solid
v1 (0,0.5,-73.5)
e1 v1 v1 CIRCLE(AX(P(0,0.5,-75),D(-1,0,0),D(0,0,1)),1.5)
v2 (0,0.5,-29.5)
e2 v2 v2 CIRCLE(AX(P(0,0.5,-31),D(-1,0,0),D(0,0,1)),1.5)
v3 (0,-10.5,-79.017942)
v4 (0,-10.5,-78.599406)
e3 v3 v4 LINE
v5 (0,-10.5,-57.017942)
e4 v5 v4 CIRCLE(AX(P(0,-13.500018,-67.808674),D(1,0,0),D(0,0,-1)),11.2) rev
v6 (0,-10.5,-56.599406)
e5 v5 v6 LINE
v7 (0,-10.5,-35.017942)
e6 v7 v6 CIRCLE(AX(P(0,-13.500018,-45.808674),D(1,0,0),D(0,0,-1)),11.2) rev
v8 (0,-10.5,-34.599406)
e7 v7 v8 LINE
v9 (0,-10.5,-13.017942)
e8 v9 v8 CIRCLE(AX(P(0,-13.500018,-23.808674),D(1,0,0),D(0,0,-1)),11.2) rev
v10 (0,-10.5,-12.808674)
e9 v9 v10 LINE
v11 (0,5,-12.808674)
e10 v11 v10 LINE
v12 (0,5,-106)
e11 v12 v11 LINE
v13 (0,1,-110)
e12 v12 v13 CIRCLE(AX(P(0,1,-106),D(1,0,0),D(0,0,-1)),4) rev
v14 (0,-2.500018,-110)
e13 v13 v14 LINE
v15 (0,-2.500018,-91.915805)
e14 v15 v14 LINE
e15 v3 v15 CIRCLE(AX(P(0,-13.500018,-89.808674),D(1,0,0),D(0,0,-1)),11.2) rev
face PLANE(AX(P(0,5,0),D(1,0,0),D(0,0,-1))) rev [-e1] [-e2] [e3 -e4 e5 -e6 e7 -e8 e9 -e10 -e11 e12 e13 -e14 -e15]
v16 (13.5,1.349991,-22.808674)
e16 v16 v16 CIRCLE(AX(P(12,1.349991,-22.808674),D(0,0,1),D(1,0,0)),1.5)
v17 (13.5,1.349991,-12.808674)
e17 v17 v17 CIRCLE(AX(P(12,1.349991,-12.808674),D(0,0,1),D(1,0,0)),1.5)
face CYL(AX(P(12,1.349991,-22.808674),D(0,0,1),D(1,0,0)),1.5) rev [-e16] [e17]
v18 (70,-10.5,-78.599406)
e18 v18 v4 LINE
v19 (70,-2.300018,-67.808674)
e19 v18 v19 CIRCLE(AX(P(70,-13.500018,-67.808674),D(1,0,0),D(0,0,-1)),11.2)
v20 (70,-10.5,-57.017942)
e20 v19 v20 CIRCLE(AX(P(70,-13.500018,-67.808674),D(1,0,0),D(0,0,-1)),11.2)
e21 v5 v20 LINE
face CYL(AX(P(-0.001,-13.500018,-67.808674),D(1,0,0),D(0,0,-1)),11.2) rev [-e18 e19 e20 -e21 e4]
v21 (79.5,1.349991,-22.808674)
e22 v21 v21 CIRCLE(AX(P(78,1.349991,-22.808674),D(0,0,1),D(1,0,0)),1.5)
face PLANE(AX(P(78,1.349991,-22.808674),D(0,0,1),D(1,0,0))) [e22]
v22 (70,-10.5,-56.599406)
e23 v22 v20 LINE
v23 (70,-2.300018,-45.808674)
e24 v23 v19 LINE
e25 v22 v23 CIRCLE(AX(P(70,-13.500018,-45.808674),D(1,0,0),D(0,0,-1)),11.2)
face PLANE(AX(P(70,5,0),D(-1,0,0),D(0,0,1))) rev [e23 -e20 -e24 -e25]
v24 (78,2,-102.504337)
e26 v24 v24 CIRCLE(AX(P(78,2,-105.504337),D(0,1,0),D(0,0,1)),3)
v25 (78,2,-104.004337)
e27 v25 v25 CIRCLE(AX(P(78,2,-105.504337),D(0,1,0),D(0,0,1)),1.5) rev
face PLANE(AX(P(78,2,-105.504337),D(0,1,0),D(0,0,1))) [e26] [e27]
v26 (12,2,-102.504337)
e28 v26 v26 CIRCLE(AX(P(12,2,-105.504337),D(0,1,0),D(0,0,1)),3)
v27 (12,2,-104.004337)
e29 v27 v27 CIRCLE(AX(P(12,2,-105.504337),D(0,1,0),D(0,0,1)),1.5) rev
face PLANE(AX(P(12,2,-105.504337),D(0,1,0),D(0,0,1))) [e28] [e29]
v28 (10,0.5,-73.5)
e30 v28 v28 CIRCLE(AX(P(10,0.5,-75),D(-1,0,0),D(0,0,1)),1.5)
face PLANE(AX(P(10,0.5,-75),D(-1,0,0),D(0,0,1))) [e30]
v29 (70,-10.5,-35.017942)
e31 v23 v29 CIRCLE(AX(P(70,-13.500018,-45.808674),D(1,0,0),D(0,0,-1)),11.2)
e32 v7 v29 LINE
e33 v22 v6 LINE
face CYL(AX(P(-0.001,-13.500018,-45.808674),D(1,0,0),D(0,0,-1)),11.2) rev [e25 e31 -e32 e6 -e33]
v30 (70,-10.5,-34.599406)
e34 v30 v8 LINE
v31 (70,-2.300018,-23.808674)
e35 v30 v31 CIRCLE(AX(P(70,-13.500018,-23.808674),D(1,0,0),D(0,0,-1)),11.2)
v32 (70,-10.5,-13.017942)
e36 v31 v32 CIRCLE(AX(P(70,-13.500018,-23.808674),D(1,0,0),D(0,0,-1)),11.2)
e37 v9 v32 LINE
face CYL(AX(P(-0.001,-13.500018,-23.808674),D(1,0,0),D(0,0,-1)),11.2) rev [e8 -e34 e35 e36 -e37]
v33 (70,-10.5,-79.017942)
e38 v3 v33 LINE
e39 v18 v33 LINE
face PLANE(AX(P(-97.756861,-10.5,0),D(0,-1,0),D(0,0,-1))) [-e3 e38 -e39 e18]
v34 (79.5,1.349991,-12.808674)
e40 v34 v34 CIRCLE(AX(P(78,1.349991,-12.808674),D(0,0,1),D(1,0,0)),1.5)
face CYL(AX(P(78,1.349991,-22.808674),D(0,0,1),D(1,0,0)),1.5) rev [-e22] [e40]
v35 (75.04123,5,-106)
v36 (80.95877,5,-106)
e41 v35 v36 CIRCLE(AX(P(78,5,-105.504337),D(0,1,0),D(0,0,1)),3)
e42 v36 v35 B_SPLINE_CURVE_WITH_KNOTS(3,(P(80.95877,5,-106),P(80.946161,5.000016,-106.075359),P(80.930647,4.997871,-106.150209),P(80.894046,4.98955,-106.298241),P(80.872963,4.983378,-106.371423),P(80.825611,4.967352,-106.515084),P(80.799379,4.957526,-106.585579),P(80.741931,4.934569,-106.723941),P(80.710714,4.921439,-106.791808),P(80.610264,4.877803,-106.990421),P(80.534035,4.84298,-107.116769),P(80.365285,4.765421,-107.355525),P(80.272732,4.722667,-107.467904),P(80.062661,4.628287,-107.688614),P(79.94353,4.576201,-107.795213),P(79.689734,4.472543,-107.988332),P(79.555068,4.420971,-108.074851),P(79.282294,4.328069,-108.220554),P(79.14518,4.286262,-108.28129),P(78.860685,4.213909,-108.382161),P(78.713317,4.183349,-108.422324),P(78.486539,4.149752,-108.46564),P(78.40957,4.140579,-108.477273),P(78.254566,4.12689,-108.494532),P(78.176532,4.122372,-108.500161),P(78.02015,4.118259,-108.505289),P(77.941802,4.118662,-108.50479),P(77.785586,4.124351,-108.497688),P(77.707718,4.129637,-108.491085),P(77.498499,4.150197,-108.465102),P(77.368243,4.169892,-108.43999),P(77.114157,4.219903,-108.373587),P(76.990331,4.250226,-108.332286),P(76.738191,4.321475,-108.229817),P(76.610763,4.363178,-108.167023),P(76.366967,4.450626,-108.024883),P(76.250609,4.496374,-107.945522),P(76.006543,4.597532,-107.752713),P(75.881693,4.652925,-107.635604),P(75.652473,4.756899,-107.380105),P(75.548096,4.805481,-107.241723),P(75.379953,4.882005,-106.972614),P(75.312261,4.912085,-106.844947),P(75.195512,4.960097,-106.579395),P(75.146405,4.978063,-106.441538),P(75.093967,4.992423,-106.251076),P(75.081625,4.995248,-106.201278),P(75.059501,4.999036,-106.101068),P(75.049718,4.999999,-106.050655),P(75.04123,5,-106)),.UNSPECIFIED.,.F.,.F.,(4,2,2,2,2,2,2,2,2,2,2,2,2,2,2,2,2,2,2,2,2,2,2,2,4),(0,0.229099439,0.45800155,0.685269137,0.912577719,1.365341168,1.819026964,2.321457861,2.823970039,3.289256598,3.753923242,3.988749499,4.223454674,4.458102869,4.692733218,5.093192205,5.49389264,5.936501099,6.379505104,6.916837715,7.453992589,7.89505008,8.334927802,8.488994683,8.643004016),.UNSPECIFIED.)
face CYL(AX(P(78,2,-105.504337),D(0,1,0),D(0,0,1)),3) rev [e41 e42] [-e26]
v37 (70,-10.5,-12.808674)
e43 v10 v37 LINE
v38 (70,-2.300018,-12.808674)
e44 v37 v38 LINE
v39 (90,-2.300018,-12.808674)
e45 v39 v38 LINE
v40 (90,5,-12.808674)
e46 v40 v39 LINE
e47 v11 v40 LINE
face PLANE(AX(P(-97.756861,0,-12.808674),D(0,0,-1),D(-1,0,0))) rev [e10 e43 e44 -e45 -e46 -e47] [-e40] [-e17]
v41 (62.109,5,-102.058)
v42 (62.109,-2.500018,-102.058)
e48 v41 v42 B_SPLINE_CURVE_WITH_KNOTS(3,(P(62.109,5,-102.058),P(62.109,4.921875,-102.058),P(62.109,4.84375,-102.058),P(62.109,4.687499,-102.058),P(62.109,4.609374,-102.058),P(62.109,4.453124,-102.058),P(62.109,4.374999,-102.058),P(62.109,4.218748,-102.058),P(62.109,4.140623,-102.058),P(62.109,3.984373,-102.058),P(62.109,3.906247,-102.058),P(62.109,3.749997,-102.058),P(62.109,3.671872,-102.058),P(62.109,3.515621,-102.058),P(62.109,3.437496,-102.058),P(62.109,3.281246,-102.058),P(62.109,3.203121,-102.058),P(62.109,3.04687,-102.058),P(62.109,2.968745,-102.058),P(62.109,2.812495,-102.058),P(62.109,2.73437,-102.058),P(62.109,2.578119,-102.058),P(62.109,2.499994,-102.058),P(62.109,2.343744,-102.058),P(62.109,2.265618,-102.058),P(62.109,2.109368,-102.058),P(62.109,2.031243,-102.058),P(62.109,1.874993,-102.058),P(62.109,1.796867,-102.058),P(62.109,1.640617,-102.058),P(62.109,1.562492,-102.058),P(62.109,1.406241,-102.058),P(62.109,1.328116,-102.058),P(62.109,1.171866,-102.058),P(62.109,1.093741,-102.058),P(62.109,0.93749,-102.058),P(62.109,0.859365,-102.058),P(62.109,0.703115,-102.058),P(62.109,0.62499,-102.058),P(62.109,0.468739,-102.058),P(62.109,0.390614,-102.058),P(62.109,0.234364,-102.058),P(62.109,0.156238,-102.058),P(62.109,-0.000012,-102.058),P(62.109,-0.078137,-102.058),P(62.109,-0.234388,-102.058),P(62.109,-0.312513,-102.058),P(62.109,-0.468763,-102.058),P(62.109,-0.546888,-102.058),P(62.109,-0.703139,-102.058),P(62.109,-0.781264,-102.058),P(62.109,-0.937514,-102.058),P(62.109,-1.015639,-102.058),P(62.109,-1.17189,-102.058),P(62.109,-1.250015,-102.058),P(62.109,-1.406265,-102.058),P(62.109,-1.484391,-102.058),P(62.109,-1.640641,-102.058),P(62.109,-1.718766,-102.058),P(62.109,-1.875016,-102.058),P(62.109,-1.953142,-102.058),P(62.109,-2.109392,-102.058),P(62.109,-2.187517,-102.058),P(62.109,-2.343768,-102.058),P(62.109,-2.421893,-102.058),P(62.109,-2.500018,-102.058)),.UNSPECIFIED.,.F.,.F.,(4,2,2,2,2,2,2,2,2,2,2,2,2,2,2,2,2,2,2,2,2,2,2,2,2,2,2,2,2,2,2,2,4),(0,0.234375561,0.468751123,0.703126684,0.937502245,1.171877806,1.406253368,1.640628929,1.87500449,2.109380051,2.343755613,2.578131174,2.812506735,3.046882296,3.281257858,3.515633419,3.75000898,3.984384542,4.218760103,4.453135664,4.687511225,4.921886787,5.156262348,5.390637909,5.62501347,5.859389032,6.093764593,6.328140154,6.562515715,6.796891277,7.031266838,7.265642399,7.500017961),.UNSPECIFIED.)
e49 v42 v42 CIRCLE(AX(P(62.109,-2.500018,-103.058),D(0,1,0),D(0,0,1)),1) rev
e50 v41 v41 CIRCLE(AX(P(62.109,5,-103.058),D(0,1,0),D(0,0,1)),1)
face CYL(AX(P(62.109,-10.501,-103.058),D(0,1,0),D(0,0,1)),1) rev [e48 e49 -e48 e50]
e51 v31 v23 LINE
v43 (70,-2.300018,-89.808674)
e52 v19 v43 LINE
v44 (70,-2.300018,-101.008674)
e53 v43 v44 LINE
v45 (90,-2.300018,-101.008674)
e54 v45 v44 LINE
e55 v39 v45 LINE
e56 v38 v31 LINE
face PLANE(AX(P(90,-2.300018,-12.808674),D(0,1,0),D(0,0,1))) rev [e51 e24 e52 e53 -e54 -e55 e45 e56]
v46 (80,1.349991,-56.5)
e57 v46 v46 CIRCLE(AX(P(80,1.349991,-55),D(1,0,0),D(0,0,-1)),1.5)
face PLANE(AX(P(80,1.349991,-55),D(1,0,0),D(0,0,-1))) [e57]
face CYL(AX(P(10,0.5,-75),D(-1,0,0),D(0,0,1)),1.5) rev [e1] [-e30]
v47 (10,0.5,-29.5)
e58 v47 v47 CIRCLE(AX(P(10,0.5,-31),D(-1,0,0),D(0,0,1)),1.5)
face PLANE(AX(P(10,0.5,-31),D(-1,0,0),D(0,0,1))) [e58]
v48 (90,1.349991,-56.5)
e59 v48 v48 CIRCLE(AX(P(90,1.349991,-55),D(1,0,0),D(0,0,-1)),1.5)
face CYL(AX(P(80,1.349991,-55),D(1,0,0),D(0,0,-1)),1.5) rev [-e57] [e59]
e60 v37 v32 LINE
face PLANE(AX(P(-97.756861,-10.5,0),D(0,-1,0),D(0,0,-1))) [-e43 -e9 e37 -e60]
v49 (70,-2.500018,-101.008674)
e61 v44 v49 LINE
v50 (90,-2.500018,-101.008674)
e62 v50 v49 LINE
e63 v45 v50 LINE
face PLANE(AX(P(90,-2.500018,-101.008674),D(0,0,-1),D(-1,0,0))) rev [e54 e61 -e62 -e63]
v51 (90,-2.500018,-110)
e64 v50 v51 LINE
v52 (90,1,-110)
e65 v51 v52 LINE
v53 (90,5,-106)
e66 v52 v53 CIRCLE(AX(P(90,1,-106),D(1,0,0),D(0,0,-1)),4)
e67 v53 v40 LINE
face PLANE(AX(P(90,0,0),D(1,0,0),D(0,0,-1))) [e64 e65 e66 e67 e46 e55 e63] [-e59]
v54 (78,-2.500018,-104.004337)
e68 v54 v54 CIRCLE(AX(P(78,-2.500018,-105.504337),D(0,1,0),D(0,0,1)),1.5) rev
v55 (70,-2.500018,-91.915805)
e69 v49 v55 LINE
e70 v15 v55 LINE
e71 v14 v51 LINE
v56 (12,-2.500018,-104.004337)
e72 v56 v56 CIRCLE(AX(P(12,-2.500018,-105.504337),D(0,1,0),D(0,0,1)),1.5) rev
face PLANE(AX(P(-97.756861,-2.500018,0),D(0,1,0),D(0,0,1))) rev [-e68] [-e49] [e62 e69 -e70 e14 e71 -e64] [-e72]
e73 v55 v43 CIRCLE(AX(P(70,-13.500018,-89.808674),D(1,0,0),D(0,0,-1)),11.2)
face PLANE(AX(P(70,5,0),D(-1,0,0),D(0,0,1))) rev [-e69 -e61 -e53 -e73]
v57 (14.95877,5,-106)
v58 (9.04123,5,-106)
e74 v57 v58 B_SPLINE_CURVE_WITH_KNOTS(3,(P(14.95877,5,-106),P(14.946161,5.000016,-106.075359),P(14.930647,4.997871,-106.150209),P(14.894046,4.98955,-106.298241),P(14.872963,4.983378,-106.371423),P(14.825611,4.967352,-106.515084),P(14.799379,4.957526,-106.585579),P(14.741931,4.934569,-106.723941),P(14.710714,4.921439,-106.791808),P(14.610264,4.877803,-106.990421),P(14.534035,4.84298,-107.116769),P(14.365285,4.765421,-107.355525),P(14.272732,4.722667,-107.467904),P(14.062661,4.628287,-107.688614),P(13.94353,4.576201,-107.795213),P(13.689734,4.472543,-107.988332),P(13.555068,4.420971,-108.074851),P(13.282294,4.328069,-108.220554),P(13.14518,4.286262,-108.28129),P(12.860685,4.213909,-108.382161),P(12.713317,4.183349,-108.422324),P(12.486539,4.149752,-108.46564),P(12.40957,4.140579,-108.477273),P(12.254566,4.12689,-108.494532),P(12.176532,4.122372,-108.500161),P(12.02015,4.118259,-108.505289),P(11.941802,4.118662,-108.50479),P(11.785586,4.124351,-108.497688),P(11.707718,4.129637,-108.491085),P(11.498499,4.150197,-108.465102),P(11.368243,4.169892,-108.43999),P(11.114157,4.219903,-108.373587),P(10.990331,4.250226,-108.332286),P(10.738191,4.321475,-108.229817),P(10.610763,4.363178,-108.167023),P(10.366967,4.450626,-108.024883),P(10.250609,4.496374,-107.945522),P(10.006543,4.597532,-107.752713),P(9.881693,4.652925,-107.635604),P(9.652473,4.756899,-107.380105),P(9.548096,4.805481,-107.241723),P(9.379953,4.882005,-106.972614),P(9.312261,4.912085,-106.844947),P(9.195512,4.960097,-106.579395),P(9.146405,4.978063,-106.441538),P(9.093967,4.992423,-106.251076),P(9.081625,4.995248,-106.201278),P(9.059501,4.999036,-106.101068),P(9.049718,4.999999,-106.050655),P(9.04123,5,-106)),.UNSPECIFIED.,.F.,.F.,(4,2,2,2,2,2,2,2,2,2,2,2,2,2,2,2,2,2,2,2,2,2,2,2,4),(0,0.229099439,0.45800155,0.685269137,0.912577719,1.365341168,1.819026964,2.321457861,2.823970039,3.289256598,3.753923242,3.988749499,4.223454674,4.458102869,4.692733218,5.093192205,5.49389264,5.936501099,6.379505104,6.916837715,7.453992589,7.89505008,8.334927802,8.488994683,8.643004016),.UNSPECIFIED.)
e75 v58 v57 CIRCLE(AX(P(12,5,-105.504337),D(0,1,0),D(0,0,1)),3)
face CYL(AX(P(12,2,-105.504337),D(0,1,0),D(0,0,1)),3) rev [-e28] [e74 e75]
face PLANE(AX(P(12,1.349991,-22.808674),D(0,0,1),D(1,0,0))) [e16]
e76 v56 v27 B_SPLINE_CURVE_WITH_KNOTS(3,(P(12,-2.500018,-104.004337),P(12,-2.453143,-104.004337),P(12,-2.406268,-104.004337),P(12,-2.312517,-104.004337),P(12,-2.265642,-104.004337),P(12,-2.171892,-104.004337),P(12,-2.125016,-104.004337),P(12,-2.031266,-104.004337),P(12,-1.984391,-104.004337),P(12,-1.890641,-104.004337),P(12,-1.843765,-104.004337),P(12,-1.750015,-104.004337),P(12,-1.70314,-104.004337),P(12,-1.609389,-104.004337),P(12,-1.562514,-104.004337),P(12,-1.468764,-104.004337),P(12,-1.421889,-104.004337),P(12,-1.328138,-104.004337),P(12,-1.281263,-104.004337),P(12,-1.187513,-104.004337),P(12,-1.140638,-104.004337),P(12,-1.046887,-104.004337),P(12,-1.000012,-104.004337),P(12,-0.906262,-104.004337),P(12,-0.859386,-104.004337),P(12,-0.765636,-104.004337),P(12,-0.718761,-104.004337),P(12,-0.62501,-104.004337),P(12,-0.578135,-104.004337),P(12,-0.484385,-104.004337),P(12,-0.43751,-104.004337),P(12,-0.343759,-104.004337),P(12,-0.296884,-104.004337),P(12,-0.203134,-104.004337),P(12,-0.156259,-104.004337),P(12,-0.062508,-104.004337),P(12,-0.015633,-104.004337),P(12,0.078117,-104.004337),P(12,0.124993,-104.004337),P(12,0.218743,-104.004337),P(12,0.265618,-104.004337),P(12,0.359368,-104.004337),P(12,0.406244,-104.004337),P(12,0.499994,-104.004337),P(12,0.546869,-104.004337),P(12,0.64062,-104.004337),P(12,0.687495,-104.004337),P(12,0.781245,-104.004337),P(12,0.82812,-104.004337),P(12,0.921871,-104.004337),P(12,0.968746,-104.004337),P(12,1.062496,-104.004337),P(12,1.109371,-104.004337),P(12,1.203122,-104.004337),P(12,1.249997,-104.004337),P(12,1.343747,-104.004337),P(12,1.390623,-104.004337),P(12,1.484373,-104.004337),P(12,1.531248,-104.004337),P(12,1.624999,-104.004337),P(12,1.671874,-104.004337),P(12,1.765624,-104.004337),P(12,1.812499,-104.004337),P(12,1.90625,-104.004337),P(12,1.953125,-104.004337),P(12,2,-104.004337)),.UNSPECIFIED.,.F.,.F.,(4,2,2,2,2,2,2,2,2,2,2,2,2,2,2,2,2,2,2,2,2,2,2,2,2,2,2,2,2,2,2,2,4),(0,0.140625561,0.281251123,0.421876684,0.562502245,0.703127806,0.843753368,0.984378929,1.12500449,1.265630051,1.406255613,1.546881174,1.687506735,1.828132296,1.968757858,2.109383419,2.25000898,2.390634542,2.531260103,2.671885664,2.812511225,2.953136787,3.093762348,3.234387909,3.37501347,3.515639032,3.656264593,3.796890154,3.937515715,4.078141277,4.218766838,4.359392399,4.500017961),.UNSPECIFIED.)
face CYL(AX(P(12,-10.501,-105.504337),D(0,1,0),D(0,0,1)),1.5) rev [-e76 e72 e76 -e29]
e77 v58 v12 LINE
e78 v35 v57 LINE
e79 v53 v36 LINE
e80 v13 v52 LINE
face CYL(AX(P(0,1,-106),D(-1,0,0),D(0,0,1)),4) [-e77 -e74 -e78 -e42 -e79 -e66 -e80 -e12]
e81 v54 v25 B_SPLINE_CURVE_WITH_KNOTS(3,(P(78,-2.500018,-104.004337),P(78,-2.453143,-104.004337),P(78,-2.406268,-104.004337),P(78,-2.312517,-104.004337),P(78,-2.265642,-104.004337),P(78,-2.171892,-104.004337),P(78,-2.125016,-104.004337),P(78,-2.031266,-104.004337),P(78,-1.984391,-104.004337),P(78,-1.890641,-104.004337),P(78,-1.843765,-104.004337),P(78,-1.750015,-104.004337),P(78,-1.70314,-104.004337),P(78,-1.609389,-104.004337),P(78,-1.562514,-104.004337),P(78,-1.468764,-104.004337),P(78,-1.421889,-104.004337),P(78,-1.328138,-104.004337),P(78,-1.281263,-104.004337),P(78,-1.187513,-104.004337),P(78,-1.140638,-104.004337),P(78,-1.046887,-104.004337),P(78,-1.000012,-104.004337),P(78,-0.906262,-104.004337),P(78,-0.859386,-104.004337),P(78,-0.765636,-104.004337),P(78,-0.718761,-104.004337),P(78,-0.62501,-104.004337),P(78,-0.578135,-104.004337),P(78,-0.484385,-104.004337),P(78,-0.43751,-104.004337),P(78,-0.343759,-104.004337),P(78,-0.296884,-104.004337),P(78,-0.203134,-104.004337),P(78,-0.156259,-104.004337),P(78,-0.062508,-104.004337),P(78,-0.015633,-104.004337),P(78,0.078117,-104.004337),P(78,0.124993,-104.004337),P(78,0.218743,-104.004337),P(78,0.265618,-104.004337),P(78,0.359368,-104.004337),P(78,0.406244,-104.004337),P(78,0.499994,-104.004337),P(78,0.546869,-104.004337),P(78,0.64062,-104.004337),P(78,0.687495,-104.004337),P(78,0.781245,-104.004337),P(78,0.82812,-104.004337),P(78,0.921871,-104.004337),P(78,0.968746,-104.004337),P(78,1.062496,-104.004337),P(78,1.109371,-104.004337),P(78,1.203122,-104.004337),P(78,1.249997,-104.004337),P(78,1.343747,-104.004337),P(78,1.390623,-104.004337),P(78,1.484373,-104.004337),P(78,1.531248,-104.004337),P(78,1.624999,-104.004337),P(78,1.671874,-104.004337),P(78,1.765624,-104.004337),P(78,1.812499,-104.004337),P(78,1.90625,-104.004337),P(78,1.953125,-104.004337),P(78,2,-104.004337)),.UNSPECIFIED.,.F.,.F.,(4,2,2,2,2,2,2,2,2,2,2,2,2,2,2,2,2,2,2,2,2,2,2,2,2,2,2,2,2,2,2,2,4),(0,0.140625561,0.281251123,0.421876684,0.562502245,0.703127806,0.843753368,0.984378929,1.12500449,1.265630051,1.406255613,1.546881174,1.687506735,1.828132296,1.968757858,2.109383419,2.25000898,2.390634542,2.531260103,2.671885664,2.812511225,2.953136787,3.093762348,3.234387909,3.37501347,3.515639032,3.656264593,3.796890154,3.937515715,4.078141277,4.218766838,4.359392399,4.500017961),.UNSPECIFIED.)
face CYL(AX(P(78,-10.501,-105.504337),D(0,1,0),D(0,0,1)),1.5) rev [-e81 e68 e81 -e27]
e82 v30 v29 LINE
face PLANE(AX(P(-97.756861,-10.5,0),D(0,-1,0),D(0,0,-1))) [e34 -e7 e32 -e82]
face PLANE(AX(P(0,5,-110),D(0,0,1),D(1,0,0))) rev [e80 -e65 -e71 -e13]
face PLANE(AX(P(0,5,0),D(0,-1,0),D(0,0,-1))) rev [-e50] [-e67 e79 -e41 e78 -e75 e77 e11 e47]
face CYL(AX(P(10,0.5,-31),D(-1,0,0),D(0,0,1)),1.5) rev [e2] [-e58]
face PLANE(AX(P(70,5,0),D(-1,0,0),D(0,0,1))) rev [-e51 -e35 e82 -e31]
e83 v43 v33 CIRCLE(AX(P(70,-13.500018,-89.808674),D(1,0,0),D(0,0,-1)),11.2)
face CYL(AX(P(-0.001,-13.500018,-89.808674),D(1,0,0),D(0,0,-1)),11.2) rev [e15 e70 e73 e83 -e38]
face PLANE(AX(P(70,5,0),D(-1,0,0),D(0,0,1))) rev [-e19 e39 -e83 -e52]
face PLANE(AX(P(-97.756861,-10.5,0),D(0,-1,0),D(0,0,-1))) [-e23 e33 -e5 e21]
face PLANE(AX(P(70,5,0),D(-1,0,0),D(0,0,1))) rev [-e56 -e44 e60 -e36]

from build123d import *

# Parameters (mm, degrees)
SKETCH_1_W          = 70
SKETCH_1_H          = 110
EXTRUDE_1_DEPTH     = 5
EXTRUDE_2_DEPTH     = 70
SKETCH_3_W          = 12.808674266
SKETCH_3_H          = 5
CUT_EXTRUDE_1_DEPTH = 70
CUT_EXTRUDE_2_REACH = 132.806
SKETCH_4_R          = 11.2
EXTRUDE_3_DEPTH     = 20
SKETCH_6_R          = 1.5
CUT_EXTRUDE_3_DEPTH = 10
SKETCH_7_R          = 1.5
CUT_EXTRUDE_4_DEPTH = 10
CUT_EXTRUDE_5_REACH = 144.969
SKETCH_8_R          = 1.5
SKETCH_9_R          = 3
CUT_EXTRUDE_6_DEPTH = 3
CUT_EXTRUDE_7_REACH = 144.969
SKETCH_10_R         = 1
FILLET_1_R          = 4
SKETCH_11_R         = 1.5
CUT_EXTRUDE_8_DEPTH = 10


with BuildPart() as part:
    # 草图1 → 凸台-拉伸1 (new body)
    with BuildSketch(Plane(origin=(0, 0, 0), x_dir=(1, 0, 0), z_dir=(0, 1, 0))):
        with Locations((35, 55)):
            Rectangle(SKETCH_1_W, SKETCH_1_H)
    extrude(amount=EXTRUDE_1_DEPTH)

    # 草图2 → 凸台-拉伸2 (add)
    with BuildSketch(Plane(origin=(70, 0, 0), x_dir=(0, 0, -1), z_dir=(1, 0, 0))):
        with BuildLine():
            Line((12.808674266, 0), (12.808674266, -10.5))
            Line((12.808674266, -10.5), (13.225674113, -10.5))
            ThreePointArc((13.225674113, -10.5), (23.808674266, -2.500017961), (34.391674418, -10.5))
            Line((34.391674418, -10.5), (35.225674113, -10.5))
            ThreePointArc((35.225674113, -10.5), (45.808674266, -2.500017961), (56.391674418, -10.5))
            Line((56.391674418, -10.5), (57.225674113, -10.5))
            ThreePointArc((57.225674113, -10.5), (67.808674266, -2.500017961), (78.391674418, -10.5))
            Line((78.391674418, -10.5), (79.225674113, -10.5))
            ThreePointArc((79.225674113, -10.5), (83.175432131, -4.725047944), (89.808674266, -2.500017961))
            Line((89.808674266, -2.500017961), (110, -2.500017961))
            Line((110, -2.500017961), (110, 0))
            Line((110, 0), (12.808674266, 0))
        make_face()
    extrude(amount=-EXTRUDE_2_DEPTH)

    # 草图3 → 切除-拉伸1 (cut)
    with BuildSketch(Plane(origin=(70, 0, 0), x_dir=(0, 0, -1), z_dir=(1, 0, 0))):
        with Locations((6.404337133, 2.5)):
            Rectangle(SKETCH_3_W, SKETCH_3_H)
    extrude(amount=-CUT_EXTRUDE_1_DEPTH, mode=Mode.SUBTRACT)

    # 草图4 → 切除-拉伸2 (cut, up to next)
    with BuildSketch(Plane(origin=(70, 0, 0), x_dir=(0, 0, -1), z_dir=(1, 0, 0)), mode=Mode.PRIVATE) as cut_extrude_2_sk1:
        with Locations((23.808674266, -13.500017961)):
            Circle(SKETCH_4_R)
    cut_extrude_2_tool1 = extrude(cut_extrude_2_sk1.sketch, amount=-CUT_EXTRUDE_2_REACH, mode=Mode.PRIVATE) & part.part
    # 草图4 → 切除-拉伸2 (cut, up to next)
    with BuildSketch(Plane(origin=(70, 0, 0), x_dir=(0, 0, -1), z_dir=(1, 0, 0)), mode=Mode.PRIVATE) as cut_extrude_2_sk2:
        with Locations((45.808674266, -13.500017961)):
            Circle(SKETCH_4_R)
    cut_extrude_2_tool2 = extrude(cut_extrude_2_sk2.sketch, amount=-CUT_EXTRUDE_2_REACH, mode=Mode.PRIVATE) & part.part
    # 草图4 → 切除-拉伸2 (cut, up to next)
    with BuildSketch(Plane(origin=(70, 0, 0), x_dir=(0, 0, -1), z_dir=(1, 0, 0)), mode=Mode.PRIVATE) as cut_extrude_2_sk3:
        with Locations((67.808674266, -13.500017961)):
            Circle(SKETCH_4_R)
    cut_extrude_2_tool3 = extrude(cut_extrude_2_sk3.sketch, amount=-CUT_EXTRUDE_2_REACH, mode=Mode.PRIVATE) & part.part
    # 草图4 → 切除-拉伸2 (cut, up to next)
    with BuildSketch(Plane(origin=(70, 0, 0), x_dir=(0, 0, -1), z_dir=(1, 0, 0)), mode=Mode.PRIVATE) as cut_extrude_2_sk4:
        with Locations((89.808674266, -13.500017961)):
            Circle(SKETCH_4_R)
    cut_extrude_2_tool4 = extrude(cut_extrude_2_sk4.sketch, amount=-CUT_EXTRUDE_2_REACH, mode=Mode.PRIVATE) & part.part
    add(cut_extrude_2_tool1.solids().sort_by_distance((70, -13.500018, -23.808674))[0], mode=Mode.SUBTRACT)
    add(cut_extrude_2_tool2.solids().sort_by_distance((70, -13.500018, -45.808674))[0], mode=Mode.SUBTRACT)
    add(cut_extrude_2_tool3.solids().sort_by_distance((70, -13.500018, -67.808674))[0], mode=Mode.SUBTRACT)
    add(cut_extrude_2_tool4.solids().sort_by_distance((70, -13.500018, -89.808674))[0], mode=Mode.SUBTRACT)

    # 草图5 → 凸台-拉伸3 (add)
    with BuildSketch(Plane(origin=(70, 0, 0), x_dir=(0, 0, -1), z_dir=(1, 0, 0))):
        Polygon((12.808674266, 5), (110, 5), (110, -2.300017961), (110, -2.500017961), (101.008674266, -2.500017961), (101.008674266, -2.300017961), (12.808674266, -2.300017961), align=None)
    extrude(amount=EXTRUDE_3_DEPTH)

    # 草图6 → 切除-拉伸3 (cut)
    with BuildSketch(Plane.ZY):
        with Locations((-31, 0.5)):
            Circle(SKETCH_6_R)
        with Locations((-75, 0.5)):
            Circle(SKETCH_6_R)
    extrude(amount=-CUT_EXTRUDE_3_DEPTH, mode=Mode.SUBTRACT)

    # 草图7 → 切除-拉伸4 (cut)
    with BuildSketch(Plane.XY.offset(-12.808674266)):
        with Locations((12, 1.34999102)):
            Circle(SKETCH_7_R)
        with Locations((78, 1.34999102)):
            Circle(SKETCH_7_R)
    extrude(amount=-CUT_EXTRUDE_4_DEPTH, mode=Mode.SUBTRACT)

    # 草图8 → 切除-拉伸5 (cut, up to next)
    with BuildSketch(Plane(origin=(0, 5, 0), x_dir=(1, 0, 0), z_dir=(0, 1, 0)), mode=Mode.PRIVATE) as cut_extrude_5_sk1:
        with Locations(Location((78, 105.504337133, 0), (0, 0, 270))):
            Circle(SKETCH_8_R)
    cut_extrude_5_tool1 = extrude(cut_extrude_5_sk1.sketch, amount=-CUT_EXTRUDE_5_REACH, mode=Mode.PRIVATE) & part.part
    # 草图8 → 切除-拉伸5 (cut, up to next)
    with BuildSketch(Plane(origin=(0, 5, 0), x_dir=(1, 0, 0), z_dir=(0, 1, 0)), mode=Mode.PRIVATE) as cut_extrude_5_sk2:
        with Locations(Location((12, 105.504337133, 0), (0, 0, 270))):
            Circle(SKETCH_8_R)
    cut_extrude_5_tool2 = extrude(cut_extrude_5_sk2.sketch, amount=-CUT_EXTRUDE_5_REACH, mode=Mode.PRIVATE) & part.part
    add(cut_extrude_5_tool1.solids().sort_by_distance((78, 5, -105.504337))[0], mode=Mode.SUBTRACT)
    add(cut_extrude_5_tool2.solids().sort_by_distance((12, 5, -105.504337))[0], mode=Mode.SUBTRACT)

    # 草图9 → 切除-拉伸6 (cut)
    with BuildSketch(Plane(origin=(0, 5, 0), x_dir=(1, 0, 0), z_dir=(0, 1, 0))):
        with Locations(Location((78, 105.504337133, 0), (0, 0, 270))):
            Circle(SKETCH_9_R)
        with Locations(Location((12, 105.504337133, 0), (0, 0, 270))):
            Circle(SKETCH_9_R)
    extrude(amount=-CUT_EXTRUDE_6_DEPTH, mode=Mode.SUBTRACT)

    # 草图10 → 切除-拉伸7 (cut, up to next)
    with BuildSketch(Plane(origin=(0, 5, 0), x_dir=(1, 0, 0), z_dir=(0, 1, 0)), mode=Mode.PRIVATE) as cut_extrude_7_sk1:
        with Locations(Location((62.109, 103.058, 0), (0, 0, 270))):
            Circle(SKETCH_10_R)
    cut_extrude_7_tool1 = extrude(cut_extrude_7_sk1.sketch, amount=-CUT_EXTRUDE_7_REACH, mode=Mode.PRIVATE) & part.part
    add(cut_extrude_7_tool1.solids().sort_by_distance((62.109, 5, -103.058))[0], mode=Mode.SUBTRACT)

    # 圆角1
    # the kernel refuses this fillet: 4 mm, written as the material it takes off along each edge
    with BuildSketch(Plane(origin=(-10, 5, -110), x_dir=(0, -1, 0), z_dir=(1, 0, 0))) as fillet_1_piece_1:
        with BuildLine():
            CenterArc((FILLET_1_R, -FILLET_1_R), FILLET_1_R, 90, 90)
            Line((0, -FILLET_1_R), (0, 0))
            Line((0, 0), (FILLET_1_R, 0))
        make_face()
    extrude(amount=110, mode=Mode.SUBTRACT)

    # 草图11 → 切除-拉伸8 (cut)
    with BuildSketch(Plane(origin=(90, 0, 0), x_dir=(0, 0, -1), z_dir=(1, 0, 0))):
        with Locations((55, 1.34999102)):
            Circle(SKETCH_11_R)
    extrude(amount=-CUT_EXTRUDE_8_DEPTH, mode=Mode.SUBTRACT)


solid = part.part
